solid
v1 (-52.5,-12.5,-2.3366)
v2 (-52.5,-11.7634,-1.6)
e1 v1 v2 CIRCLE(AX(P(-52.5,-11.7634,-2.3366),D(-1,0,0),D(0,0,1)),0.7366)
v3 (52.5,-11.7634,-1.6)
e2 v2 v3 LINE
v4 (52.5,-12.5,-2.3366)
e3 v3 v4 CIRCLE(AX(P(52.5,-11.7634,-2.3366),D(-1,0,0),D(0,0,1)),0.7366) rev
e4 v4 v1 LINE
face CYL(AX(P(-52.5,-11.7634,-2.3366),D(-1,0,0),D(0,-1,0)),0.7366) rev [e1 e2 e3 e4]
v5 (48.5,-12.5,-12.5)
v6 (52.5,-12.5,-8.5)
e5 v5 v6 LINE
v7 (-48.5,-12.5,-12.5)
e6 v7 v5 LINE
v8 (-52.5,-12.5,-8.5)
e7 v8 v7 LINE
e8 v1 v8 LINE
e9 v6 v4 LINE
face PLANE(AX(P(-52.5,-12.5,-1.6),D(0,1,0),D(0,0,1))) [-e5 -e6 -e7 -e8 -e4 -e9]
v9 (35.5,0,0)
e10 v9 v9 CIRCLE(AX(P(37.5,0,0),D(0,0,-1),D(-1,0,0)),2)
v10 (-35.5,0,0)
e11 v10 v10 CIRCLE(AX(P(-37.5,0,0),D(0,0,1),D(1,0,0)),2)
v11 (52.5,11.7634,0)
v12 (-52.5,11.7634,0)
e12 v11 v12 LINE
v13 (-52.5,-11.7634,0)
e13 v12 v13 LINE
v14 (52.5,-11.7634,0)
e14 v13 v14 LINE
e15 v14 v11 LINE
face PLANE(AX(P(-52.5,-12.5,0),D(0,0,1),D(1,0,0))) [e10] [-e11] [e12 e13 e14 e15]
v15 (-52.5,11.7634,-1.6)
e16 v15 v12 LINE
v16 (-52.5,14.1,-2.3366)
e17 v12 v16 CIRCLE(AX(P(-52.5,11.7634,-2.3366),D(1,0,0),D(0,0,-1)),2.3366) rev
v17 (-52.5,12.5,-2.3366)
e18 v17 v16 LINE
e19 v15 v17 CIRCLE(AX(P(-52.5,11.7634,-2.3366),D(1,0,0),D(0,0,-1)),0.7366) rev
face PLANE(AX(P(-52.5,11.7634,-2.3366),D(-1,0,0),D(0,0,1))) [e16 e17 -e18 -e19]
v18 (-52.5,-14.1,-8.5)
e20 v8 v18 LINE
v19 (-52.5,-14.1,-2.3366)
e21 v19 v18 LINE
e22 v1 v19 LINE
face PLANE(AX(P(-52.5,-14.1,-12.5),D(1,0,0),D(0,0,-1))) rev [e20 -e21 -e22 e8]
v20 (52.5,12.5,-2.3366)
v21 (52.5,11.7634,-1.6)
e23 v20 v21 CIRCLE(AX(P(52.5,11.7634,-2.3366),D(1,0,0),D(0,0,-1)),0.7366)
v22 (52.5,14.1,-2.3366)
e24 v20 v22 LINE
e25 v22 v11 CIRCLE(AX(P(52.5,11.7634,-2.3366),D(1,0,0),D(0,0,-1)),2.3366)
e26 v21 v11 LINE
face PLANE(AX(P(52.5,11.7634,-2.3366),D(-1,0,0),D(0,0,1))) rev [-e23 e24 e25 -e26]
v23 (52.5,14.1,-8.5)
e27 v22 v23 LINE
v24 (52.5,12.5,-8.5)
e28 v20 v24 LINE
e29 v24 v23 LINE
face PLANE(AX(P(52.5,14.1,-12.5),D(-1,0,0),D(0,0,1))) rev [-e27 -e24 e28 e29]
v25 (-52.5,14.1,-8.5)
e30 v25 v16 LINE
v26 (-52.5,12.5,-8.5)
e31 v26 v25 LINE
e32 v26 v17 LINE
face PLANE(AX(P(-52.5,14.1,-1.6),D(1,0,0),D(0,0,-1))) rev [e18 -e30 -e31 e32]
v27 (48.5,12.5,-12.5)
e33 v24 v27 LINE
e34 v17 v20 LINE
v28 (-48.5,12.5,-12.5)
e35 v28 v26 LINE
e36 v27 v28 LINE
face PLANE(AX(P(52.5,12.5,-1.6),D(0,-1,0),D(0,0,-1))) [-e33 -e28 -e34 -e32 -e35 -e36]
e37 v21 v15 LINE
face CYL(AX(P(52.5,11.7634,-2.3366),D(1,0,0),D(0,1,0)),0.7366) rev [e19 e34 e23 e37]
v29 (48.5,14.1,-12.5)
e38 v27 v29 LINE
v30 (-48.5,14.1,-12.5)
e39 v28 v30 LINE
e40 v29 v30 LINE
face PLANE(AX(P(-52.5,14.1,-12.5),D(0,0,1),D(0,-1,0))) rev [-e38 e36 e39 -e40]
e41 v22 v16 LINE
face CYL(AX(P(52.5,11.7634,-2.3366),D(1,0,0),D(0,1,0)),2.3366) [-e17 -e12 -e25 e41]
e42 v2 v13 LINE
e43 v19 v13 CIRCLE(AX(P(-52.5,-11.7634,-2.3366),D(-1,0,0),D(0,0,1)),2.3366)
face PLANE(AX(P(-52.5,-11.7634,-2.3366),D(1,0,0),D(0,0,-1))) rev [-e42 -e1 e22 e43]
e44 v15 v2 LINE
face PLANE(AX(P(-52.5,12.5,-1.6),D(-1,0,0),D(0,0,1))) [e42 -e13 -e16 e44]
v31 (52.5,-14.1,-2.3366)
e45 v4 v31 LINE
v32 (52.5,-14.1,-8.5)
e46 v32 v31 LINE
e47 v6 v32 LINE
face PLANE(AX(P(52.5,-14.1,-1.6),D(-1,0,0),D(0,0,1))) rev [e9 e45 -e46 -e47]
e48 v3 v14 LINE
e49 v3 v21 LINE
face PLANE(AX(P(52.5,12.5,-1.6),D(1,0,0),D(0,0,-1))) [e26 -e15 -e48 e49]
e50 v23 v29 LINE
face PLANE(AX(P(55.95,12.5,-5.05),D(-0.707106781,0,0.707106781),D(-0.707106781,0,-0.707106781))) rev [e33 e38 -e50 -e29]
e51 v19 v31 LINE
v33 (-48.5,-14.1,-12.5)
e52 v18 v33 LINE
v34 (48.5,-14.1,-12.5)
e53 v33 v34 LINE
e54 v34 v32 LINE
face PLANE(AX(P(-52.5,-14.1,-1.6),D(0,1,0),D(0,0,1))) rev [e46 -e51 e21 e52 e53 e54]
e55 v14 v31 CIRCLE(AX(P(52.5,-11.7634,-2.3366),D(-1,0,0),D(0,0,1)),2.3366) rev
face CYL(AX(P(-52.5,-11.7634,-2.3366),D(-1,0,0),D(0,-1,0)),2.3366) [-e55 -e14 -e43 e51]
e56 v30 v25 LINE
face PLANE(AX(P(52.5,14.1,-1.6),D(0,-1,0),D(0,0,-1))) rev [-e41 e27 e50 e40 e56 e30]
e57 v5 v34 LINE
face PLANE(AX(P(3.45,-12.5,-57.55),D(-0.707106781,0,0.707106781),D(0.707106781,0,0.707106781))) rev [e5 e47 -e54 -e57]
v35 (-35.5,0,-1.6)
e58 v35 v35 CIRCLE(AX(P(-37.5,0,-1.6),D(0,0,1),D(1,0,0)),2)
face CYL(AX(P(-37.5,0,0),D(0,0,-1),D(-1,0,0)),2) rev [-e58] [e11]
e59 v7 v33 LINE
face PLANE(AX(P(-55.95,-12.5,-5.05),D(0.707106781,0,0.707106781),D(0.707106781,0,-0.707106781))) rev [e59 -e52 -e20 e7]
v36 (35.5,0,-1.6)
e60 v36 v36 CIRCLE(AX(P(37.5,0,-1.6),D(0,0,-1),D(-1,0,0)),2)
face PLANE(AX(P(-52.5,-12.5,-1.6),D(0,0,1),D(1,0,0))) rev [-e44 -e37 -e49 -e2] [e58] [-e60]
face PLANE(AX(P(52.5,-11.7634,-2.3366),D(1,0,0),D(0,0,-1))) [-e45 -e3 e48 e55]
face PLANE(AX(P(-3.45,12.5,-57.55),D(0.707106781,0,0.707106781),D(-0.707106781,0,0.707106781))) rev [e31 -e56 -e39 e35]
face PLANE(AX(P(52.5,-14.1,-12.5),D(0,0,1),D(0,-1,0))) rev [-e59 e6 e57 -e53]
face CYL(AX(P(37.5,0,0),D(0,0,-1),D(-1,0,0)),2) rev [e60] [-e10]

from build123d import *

# Parameters (mm, degrees)
SKETCH_1_W                         = 105
SKETCH_1_H                         = 25
SM_BASE_FLANGE_1_DEPTH             = 1.6
SM_EDGE_FLANGE_1_STRIP_W           = 7.8732
SM_EDGE_FLANGE_1_STRIP_H           = 1.6
SM_EDGE_FLANGE_1_STRIP_CUT_DEPTH   = 105
SM_EDGE_FLANGE_1_STRIP_2_W         = 7.8732
SM_EDGE_FLANGE_1_STRIP_2_H         = 1.6
SM_EDGE_FLANGE_1_STRIP_CUT_2_DEPTH = 105
SM_EDGE_FLANGE_1_DEPTH             = 105
SM_EDGE_FLANGE_1_BEND_DEPTH        = 105
CUT_EXTRUDE_1_DEPTH                = 56.779117956
CUT_EXTRUDE_1_DEPTH_BACK           = 56.779117956
SKETCH_13_R                        = 2
CUT_EXTRUDE_2_DEPTH                = 56.442492729


# Sheet-metal steps are written as plain solids
with BuildPart() as part:
    # Sketch 1 → 基体-法兰1 (new body)
    with BuildSketch(Plane.XY):
        Rectangle(SKETCH_1_W, SKETCH_1_H)
    extrude(amount=-SM_BASE_FLANGE_1_DEPTH)

    # 边线-法兰1 strip (across the edge) → 边线-法兰1 strip cut (cut)
    with BuildSketch(Plane(origin=(-52.5, 12.5, -1.6), x_dir=(0, -1, 0), z_dir=(1, 0, 0))):
        with Locations((-3.2, -0.8)):
            Rectangle(SM_EDGE_FLANGE_1_STRIP_W, SM_EDGE_FLANGE_1_STRIP_H)
    extrude(amount=SM_EDGE_FLANGE_1_STRIP_CUT_DEPTH, mode=Mode.SUBTRACT)

    # 边线-法兰1 strip 2 (across the edge) → 边线-法兰1 strip cut 2 (cut)
    with BuildSketch(Plane(origin=(52.5, -12.5, -1.6), x_dir=(0, 1, 0), z_dir=(-1, 0, 0))):
        with Locations((-3.2, -0.8)):
            Rectangle(SM_EDGE_FLANGE_1_STRIP_2_W, SM_EDGE_FLANGE_1_STRIP_2_H)
    extrude(amount=SM_EDGE_FLANGE_1_STRIP_CUT_2_DEPTH, mode=Mode.SUBTRACT)

    # 边线-法兰1 section (across the edge) → 边线-法兰1 (add)
    with BuildSketch(Plane(origin=(-52.5, 12.5, -1.6), x_dir=(0, -1, 0), z_dir=(1, 0, 0))):
        with BuildLine():
            Line((-1.6, 0.7366), (-1.6, 10.9))
            Line((-1.6, 10.9), (0, 10.9))
            Line((0, 10.9), (0, 0.7366))
            ThreePointArc((0, 0.7366), (0.215745145, 0.215745145), (0.7366, 0))
            Line((0.7366, 0), (0.7366, -1.6))
            ThreePointArc((0.7366, -1.6), (-0.915625705, -0.915625705), (-1.6, 0.7366))
        make_face()
    extrude(amount=SM_EDGE_FLANGE_1_DEPTH)

    # 边线-法兰1 section 2 (across the edge) → 边线-法兰1 bend (add)
    with BuildSketch(Plane(origin=(52.5, -12.5, -1.6), x_dir=(0, 1, 0), z_dir=(-1, 0, 0))):
        with BuildLine():
            Line((-1.6, 0.7366), (-1.6, 10.9))
            Line((-1.6, 10.9), (0, 10.9))
            Line((0, 10.9), (0, 0.7366))
            ThreePointArc((0, 0.7366), (0.215745145, 0.215745145), (0.7366, 0))
            Line((0.7366, 0), (0.7366, -1.6))
            ThreePointArc((0.7366, -1.6), (-0.915625705, -0.915625705), (-1.6, 0.7366))
        make_face()
    extrude(amount=SM_EDGE_FLANGE_1_BEND_DEPTH)

    # 草图12 → 切除-拉伸1 (cut, two sides: drawn at the far end of the back side and taken through both)
    with BuildSketch(Plane(origin=(0, 0, 0), x_dir=(1, 0, 0), z_dir=(0, 1, 0)).offset(-CUT_EXTRUDE_1_DEPTH_BACK)):
        Polygon((-52.5, 8.5), (-48.5, 12.5), (-52.5, 12.5), align=None)
        Polygon((48.5, 12.5), (52.5, 12.5), (52.5, 8.5), align=None)
    extrude(amount=CUT_EXTRUDE_1_DEPTH + CUT_EXTRUDE_1_DEPTH_BACK, mode=Mode.SUBTRACT)

    # 草图13 → 切除-拉伸2 (cut, through all)
    with BuildSketch(Plane(origin=(0, 0, -1.6), x_dir=(-1, 0, 0), z_dir=(0, 0, -1))):
        with Locations((-37.5, 0)):
            Circle(SKETCH_13_R)
    cut_extrude_2 = extrude(amount=-CUT_EXTRUDE_2_DEPTH, mode=Mode.SUBTRACT)

    # 镜向1: 切除-拉伸2 across plane
    add(cut_extrude_2.mirror(Plane(origin=(0, 0, 0), x_dir=(0, 0, 1), z_dir=(1, 0, 0))), mode=Mode.SUBTRACT)


solid = part.part
